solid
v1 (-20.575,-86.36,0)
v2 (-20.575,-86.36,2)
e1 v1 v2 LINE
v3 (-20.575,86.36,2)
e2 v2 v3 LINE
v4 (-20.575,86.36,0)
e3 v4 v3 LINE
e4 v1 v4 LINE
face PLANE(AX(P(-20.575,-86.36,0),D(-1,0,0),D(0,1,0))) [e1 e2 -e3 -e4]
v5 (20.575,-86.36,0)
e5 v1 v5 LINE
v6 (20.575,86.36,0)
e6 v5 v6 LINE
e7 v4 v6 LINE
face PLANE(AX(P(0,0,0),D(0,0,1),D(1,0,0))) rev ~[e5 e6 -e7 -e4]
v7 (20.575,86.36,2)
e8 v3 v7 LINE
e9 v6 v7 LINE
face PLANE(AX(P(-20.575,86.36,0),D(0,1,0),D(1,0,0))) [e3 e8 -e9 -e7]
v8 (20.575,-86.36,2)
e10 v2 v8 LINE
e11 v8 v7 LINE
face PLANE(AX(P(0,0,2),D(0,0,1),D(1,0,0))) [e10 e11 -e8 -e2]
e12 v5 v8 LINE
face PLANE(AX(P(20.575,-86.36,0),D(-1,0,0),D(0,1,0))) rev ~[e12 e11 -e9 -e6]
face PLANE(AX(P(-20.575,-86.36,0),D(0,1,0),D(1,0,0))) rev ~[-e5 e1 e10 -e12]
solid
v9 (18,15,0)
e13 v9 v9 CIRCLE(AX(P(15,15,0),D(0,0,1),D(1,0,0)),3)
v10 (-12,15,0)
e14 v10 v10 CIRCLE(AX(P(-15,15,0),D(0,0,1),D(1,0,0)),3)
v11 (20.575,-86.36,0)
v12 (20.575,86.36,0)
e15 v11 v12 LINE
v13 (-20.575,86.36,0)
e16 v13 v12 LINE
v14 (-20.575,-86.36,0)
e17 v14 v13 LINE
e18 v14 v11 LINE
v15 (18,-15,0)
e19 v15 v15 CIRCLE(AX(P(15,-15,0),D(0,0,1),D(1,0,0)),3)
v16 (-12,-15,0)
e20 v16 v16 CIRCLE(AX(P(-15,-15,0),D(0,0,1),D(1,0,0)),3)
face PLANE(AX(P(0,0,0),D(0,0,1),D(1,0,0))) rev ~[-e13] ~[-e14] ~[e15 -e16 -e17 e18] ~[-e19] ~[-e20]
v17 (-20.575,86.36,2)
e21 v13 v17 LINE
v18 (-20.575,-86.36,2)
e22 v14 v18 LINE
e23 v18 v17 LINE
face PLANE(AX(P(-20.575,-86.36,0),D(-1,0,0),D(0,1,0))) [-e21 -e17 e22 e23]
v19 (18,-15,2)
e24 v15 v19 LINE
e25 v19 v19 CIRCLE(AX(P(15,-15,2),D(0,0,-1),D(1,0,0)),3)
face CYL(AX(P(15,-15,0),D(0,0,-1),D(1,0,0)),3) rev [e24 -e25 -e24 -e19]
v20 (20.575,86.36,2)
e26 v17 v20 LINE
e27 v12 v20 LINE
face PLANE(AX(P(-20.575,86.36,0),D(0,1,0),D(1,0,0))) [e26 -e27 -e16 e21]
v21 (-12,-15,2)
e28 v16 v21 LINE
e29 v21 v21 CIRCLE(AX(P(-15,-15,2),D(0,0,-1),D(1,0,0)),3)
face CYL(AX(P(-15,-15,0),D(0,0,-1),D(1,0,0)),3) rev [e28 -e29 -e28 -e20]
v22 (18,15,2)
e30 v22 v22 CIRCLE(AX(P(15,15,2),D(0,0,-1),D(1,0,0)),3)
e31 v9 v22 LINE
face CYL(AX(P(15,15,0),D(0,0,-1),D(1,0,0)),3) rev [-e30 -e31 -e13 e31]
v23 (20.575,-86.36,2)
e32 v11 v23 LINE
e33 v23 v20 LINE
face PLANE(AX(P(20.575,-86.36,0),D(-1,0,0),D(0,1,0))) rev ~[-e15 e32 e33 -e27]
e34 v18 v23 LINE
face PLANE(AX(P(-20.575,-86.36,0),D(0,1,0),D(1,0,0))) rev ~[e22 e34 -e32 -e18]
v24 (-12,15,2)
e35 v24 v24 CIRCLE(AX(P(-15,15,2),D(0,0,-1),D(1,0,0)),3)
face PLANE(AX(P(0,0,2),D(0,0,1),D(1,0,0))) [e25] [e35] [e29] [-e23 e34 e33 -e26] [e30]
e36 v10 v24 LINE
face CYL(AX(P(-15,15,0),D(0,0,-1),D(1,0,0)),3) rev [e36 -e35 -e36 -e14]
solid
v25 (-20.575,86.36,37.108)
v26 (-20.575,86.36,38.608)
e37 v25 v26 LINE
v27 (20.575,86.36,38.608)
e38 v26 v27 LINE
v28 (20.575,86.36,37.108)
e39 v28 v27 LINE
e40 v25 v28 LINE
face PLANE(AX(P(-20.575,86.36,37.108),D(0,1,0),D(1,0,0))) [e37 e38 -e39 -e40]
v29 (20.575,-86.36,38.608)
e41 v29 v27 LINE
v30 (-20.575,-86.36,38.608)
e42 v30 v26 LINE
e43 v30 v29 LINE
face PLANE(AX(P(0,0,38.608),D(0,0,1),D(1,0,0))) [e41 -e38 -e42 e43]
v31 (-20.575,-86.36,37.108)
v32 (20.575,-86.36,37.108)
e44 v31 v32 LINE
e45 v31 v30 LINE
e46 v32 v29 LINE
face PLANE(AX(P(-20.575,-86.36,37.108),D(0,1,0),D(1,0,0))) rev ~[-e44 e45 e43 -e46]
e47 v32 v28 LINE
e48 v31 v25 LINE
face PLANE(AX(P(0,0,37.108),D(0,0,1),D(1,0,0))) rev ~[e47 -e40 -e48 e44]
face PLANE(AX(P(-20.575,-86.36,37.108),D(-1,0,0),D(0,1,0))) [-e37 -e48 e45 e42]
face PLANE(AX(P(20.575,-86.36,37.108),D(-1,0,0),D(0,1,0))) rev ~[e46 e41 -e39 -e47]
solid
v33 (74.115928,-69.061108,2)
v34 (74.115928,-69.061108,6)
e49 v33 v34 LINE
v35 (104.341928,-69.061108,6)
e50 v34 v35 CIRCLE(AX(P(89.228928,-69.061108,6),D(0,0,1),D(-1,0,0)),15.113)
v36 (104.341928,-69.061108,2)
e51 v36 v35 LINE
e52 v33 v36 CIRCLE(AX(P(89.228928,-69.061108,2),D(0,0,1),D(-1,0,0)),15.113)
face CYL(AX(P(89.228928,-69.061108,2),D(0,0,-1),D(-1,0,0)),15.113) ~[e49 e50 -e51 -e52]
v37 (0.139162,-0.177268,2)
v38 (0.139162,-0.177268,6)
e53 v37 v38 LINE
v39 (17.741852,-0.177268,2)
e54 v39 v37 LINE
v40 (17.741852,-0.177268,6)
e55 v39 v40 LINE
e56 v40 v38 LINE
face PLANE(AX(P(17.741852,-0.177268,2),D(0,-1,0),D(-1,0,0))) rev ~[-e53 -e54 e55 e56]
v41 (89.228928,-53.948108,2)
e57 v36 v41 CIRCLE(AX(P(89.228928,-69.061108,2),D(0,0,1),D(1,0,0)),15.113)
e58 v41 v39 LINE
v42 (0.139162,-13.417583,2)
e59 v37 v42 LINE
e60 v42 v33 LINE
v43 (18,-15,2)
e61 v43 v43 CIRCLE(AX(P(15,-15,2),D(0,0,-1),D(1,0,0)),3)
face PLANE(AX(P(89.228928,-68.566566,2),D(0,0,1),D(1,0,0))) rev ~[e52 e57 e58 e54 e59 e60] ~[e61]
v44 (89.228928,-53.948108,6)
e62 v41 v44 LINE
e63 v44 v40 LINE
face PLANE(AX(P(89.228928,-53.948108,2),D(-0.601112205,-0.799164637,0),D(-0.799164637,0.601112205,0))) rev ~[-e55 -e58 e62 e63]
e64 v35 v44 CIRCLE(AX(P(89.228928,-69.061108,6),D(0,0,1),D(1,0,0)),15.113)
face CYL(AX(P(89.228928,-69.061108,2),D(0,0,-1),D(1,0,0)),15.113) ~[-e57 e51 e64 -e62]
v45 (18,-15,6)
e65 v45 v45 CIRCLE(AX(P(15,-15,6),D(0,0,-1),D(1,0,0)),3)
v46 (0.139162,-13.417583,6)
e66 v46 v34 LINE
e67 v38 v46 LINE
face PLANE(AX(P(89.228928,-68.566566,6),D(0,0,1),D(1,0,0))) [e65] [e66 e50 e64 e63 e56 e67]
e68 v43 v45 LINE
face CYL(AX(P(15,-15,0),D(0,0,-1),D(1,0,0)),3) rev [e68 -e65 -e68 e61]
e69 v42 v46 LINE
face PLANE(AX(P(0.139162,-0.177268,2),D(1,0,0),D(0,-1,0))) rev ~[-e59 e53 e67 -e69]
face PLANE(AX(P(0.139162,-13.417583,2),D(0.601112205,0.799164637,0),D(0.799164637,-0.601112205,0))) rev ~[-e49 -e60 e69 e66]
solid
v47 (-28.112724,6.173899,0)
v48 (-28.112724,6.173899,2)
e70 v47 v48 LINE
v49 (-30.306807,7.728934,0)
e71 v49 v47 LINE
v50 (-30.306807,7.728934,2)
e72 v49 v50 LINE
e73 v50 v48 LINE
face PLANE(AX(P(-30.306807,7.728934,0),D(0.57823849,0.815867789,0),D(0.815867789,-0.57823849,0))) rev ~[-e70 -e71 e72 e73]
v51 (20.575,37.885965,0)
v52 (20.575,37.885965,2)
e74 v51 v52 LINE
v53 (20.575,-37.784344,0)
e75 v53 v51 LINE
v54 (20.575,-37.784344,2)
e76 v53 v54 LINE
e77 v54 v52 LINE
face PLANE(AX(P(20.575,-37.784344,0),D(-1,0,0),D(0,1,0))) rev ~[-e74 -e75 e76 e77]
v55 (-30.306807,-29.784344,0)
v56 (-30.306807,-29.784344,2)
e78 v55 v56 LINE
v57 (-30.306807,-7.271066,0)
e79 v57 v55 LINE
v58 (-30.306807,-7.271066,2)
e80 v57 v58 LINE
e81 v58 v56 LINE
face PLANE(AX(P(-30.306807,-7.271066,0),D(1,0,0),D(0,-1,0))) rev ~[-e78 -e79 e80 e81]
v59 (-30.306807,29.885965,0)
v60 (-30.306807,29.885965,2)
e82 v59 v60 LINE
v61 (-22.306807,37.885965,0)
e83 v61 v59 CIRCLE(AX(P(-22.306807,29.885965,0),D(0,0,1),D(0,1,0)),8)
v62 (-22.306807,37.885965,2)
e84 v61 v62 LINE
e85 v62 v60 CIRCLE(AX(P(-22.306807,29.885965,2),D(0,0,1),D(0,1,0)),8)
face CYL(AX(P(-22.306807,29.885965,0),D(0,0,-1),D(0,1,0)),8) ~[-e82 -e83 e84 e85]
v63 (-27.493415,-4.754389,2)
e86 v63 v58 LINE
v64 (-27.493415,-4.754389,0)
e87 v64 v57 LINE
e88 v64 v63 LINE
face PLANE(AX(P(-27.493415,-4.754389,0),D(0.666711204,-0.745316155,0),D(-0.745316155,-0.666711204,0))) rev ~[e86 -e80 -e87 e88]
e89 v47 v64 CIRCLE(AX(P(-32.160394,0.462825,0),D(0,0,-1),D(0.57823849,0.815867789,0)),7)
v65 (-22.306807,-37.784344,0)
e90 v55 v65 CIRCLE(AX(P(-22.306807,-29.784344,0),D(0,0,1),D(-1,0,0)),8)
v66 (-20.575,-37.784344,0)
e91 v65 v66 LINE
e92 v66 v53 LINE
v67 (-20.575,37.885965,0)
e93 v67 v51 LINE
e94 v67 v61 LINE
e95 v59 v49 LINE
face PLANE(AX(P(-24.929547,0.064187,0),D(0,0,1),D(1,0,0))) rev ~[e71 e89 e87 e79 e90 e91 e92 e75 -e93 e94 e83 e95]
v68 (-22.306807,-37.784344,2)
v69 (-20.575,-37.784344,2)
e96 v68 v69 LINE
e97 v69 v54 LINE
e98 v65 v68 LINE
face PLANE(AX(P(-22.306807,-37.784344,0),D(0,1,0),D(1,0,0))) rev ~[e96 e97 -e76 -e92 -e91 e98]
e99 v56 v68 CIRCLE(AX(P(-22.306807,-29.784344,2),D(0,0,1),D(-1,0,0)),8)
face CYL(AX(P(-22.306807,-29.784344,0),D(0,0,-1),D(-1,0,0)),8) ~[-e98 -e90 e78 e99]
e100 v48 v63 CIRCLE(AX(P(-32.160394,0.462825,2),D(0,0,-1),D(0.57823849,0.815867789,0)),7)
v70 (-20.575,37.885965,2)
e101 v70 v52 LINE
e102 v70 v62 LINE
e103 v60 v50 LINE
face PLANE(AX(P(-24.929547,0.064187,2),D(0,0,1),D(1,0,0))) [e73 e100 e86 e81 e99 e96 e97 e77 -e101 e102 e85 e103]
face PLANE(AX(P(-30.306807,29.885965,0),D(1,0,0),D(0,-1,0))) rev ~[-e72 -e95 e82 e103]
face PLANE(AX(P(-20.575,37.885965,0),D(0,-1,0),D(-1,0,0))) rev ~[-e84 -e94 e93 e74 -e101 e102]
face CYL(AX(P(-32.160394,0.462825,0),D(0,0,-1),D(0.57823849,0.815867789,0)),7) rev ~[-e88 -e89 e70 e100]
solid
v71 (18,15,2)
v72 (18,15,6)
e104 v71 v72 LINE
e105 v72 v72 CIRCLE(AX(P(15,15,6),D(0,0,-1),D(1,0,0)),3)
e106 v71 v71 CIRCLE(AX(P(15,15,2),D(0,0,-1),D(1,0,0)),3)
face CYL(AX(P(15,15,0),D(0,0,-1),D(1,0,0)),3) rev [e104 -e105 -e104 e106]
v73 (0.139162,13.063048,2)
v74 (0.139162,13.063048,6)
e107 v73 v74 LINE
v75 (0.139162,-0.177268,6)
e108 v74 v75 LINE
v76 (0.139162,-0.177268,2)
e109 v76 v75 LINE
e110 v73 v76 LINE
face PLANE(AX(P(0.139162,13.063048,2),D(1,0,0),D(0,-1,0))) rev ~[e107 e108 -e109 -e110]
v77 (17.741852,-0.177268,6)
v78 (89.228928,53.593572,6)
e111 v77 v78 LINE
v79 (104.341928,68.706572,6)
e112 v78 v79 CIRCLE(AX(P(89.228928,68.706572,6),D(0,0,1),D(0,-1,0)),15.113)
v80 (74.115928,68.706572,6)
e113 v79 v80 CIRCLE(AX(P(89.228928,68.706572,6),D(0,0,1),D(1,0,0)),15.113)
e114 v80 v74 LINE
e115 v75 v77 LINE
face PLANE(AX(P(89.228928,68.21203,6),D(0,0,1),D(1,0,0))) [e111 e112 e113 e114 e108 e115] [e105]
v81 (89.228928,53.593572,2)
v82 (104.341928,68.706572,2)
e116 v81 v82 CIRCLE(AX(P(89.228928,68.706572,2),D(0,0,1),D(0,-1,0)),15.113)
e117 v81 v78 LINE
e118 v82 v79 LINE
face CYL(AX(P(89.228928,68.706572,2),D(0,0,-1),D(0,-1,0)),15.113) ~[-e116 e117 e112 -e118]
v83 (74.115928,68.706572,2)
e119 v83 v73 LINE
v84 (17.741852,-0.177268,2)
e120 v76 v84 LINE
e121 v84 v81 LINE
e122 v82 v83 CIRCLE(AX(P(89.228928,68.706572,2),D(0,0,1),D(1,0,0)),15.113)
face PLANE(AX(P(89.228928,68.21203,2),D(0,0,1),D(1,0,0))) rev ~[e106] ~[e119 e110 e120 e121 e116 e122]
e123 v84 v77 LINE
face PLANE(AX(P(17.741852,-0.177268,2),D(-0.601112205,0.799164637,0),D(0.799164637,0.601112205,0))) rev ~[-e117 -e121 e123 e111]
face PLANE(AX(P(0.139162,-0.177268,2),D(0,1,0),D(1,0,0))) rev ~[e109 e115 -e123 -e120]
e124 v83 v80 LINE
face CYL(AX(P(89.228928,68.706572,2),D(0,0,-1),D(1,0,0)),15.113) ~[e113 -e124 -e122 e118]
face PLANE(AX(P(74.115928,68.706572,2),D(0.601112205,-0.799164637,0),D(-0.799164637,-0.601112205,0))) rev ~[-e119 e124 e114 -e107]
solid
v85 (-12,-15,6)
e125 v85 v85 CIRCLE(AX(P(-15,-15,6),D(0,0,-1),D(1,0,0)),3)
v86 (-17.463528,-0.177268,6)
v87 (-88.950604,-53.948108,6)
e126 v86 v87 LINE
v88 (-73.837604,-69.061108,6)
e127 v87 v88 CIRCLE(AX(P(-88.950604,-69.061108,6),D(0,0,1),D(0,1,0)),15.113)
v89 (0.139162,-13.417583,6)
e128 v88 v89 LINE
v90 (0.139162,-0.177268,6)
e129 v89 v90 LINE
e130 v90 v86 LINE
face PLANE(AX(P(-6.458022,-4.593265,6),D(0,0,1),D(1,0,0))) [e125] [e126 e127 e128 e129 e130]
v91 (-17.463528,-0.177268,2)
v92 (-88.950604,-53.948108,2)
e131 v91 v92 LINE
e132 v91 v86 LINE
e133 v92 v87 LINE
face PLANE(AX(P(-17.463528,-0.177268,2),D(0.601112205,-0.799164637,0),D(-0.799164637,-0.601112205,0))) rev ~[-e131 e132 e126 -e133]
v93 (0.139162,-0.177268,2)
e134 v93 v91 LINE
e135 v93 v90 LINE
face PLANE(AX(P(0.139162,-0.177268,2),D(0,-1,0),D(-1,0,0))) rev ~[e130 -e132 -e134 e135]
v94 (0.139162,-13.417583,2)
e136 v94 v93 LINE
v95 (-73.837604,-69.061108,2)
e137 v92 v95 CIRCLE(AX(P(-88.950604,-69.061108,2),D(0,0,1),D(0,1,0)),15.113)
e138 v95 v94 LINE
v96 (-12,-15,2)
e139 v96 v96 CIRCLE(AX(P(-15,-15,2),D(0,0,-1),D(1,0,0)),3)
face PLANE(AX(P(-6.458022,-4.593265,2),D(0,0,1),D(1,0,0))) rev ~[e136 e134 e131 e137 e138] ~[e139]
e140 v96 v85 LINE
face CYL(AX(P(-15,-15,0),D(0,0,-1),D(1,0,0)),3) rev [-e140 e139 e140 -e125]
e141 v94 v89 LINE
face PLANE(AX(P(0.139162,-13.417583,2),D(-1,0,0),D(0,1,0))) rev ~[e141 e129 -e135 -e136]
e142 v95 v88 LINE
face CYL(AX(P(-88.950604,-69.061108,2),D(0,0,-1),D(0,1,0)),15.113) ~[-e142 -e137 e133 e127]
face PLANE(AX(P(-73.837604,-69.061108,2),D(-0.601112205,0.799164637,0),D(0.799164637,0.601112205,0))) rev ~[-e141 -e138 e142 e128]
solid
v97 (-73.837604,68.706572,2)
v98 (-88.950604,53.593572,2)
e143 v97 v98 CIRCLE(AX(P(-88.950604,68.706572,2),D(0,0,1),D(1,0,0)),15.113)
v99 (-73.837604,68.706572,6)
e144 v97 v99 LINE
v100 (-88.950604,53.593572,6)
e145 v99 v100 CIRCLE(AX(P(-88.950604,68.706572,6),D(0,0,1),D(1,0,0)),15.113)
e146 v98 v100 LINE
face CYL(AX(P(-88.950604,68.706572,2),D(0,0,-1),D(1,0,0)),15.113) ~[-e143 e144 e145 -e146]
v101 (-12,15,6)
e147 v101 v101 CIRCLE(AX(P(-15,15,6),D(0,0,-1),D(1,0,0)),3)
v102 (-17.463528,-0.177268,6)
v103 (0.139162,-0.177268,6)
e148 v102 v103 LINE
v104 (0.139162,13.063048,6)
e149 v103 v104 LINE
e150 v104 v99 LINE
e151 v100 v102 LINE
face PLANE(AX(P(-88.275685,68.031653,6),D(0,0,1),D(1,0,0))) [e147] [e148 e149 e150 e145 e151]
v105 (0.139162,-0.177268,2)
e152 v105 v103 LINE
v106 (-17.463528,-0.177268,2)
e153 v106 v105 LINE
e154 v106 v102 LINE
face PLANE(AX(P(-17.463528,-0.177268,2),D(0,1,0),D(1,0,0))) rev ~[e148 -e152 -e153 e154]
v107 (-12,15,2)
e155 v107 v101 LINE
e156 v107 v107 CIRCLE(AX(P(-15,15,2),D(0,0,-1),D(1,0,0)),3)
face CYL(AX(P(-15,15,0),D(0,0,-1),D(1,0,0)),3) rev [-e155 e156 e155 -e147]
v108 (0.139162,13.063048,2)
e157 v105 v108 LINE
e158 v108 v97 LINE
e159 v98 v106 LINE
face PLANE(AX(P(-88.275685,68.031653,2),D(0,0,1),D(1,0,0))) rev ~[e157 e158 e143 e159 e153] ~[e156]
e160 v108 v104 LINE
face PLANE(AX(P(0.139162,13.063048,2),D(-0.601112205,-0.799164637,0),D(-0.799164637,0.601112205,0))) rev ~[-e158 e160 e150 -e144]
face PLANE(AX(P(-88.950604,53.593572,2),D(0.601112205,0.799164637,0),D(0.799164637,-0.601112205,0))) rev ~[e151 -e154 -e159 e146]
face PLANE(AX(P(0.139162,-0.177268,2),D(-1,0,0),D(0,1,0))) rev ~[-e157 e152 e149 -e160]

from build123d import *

# Parameters (mm, degrees)
F0_W           = 41.15
F0_H           = 172.72
F1_DEPTH       = 2
F3_START       = 2
F3_DEPTH       = 4
F4_START       = 2
F4_DEPTH       = 4
F5_START       = 2
F5_DEPTH       = 4
F6_START       = 2
F6_DEPTH       = 4
F8_START       = 37.108
F7_W           = 41.15
F7_H           = 172.72
F8_DEPTH       = 1.5
F9_R           = 3
F10_DEPTH      = 2
F10_DEPTH_BACK = 8
F11_W          = 41.15
F11_H          = 75.6703085505
F12_DEPTH      = 2


# Not quite as in the source:
# - a feature names something its author has since deleted; it is built from what else it names


with BuildPart() as f1:
    # F0 (on Top) → F1 (new body)
    with BuildSketch(Plane.XY):
        Rectangle(F0_W, F0_H)
    extrude(amount=F1_DEPTH)


with BuildPart() as f3:
    # F2 (on Top) → F3 (new body)
    with BuildSketch(Plane.XY.offset(F3_START)):
        Polygon((0.1391619444, -0.1772679389), (-17.4635283139, -0.1772679389), (0.1391619444, -13.4175834731), align=None)
        with BuildLine():
            Line((0.1391619444, -13.4175834731), (-17.4635283139, -0.1772679389))
            Line((-17.4635283139, -0.1772679389), (-88.9506042004, -53.9481079335))
            ThreePointArc((-88.9506042004, -53.9481079335), (-78.2640994163, -58.3746031494), (-73.8376042004, -69.0611079335))
            Line((-73.8376042004, -69.0611079335), (0.1391619444, -13.4175834731))
        make_face()
        with BuildLine():
            ThreePointArc((-73.8376042004, -69.0611079335), (-78.2640994163, -58.3746031494), (-88.9506042004, -53.9481079335))
            ThreePointArc((-88.9506042004, -53.9481079335), (-99.6371089844, -79.7476127176), (-73.8376042004, -69.0611079335))
        make_face()
    extrude(amount=F3_DEPTH)


with BuildPart() as f4:
    # F2 (on Top) → F4 (new body)
    with BuildSketch(Plane.XY.offset(F4_START)):
        with BuildLine():
            ThreePointArc((104.3419280891, -69.0611079335), (99.9154328732, -58.3746031494), (89.2289280891, -53.9481079335))
            ThreePointArc((89.2289280891, -53.9481079335), (78.5424233051, -58.3746031494), (74.1159280891, -69.0611079335))
            ThreePointArc((74.1159280891, -69.0611079335), (89.2289280891, -84.1741079335), (104.3419280891, -69.0611079335))
        make_face()
        with BuildLine():
            Line((89.2289280891, -53.9481079335), (17.7418522027, -0.1772679389))
            Line((17.7418522027, -0.1772679389), (0.1391619444, -13.4175834731))
            Line((0.1391619444, -13.4175834731), (74.1159280891, -69.0611079335))
            ThreePointArc((74.1159280891, -69.0611079335), (78.5424233051, -58.3746031494), (89.2289280891, -53.9481079335))
        make_face()
        Polygon((0.1391619444, -13.4175834731), (17.7418522027, -0.1772679389), (0.1391619444, -0.1772679389), align=None)
    extrude(amount=F4_DEPTH)


with BuildPart() as f5:
    # F2 (on Top) → F5 (new body)
    with BuildSketch(Plane.XY.offset(F5_START)):
        with BuildLine():
            ThreePointArc((104.3419280891, 68.7065720558), (89.2289280891, 83.8195720558), (74.1159280891, 68.7065720558))
            ThreePointArc((74.1159280891, 68.7065720558), (78.5424233051, 58.0200672717), (89.2289280891, 53.5935720558))
            ThreePointArc((89.2289280891, 53.5935720558), (99.9154328732, 58.0200672717), (104.3419280891, 68.7065720558))
        make_face()
        with BuildLine():
            Line((74.1159280891, 68.7065720558), (0.1391619444, 13.0630475954))
            Line((0.1391619444, 13.0630475954), (17.7418522027, -0.1772679389))
            Line((17.7418522027, -0.1772679389), (89.2289280891, 53.5935720558))
            ThreePointArc((89.2289280891, 53.5935720558), (78.5424233051, 58.0200672717), (74.1159280891, 68.7065720558))
        make_face()
        Polygon((17.7418522027, -0.1772679389), (0.1391619444, 13.0630475954), (0.1391619444, -0.1772679389), align=None)
    extrude(amount=F5_DEPTH)


with BuildPart() as f6:
    # F2 (on Top) → F6 (new body)
    with BuildSketch(Plane.XY.offset(F6_START)):
        with BuildLine():
            ThreePointArc((-88.9506042004, 53.5935720558), (-78.2640994163, 58.0200672717), (-73.8376042004, 68.7065720558))
            ThreePointArc((-73.8376042004, 68.7065720558), (-99.6371089844, 79.3930768399), (-88.9506042004, 53.5935720558))
        make_face()
        with BuildLine():
            Line((0.1391619444, 13.0630475954), (-73.8376042004, 68.7065720558))
            ThreePointArc((-73.8376042004, 68.7065720558), (-78.2640994163, 58.0200672717), (-88.9506042004, 53.5935720558))
            Line((-88.9506042004, 53.5935720558), (-17.4635283139, -0.1772679389))
            Line((-17.4635283139, -0.1772679389), (0.1391619444, 13.0630475954))
        make_face()
        Polygon((0.1391619444, -0.1772679389), (0.1391619444, 13.0630475954), (-17.4635283139, -0.1772679389), align=None)
    extrude(amount=F6_DEPTH)


with BuildPart() as f8:
    # F7 (on Top) → F8 (new body)
    with BuildSketch(Plane.XY.offset(F8_START)):
        Rectangle(F7_W, F7_H)
    extrude(amount=F8_DEPTH)


with BuildPart() as f10_tool:
    # F9 (on face) → F10 (new body, two sides)
    with BuildSketch(Plane.XY) as f10_sk:
        with Locations((15, 15)):
            Circle(F9_R)
        with Locations((15, -15)):
            Circle(F9_R)
        with Locations((-15, -15)):
            Circle(F9_R)
        with Locations((-15, 15)):
            Circle(F9_R)
    extrude(amount=-F10_DEPTH)
    extrude(f10_sk.sketch, amount=F10_DEPTH_BACK)


with BuildPart() as f1_1:
    add(f1.part)

    # F10: cut by f10_tool
    add(f10_tool.part, mode=Mode.SUBTRACT)


with BuildPart() as f3_1:
    add(f3.part)

    # F10: cut by f10_tool
    add(f10_tool.part, mode=Mode.SUBTRACT)


with BuildPart() as f4_1:
    add(f4.part)

    # F10: cut by f10_tool
    add(f10_tool.part, mode=Mode.SUBTRACT)


with BuildPart() as f5_1:
    add(f5.part)

    # F10: cut by f10_tool
    add(f10_tool.part, mode=Mode.SUBTRACT)


with BuildPart() as f6_1:
    add(f6.part)

    # F10: cut by f10_tool
    add(f10_tool.part, mode=Mode.SUBTRACT)


with BuildPart() as f12:
    # F11 (on face) → F12 (new body)
    with BuildSketch(Plane.XY):
        with BuildLine():
            Line((-20.575, 37.8859647318), (-22.3068072487, 37.8859647318))
            ThreePointArc((-22.3068072487, 37.8859647318), (-27.9636614982, 35.5428189813), (-30.3068072487, 29.8859647318))
            Line((-30.3068072487, 29.8859647318), (-30.3068072487, 7.7289344695))
            Line((-30.3068072487, 7.7289344695), (-28.1127241634, 6.173899075))
            ThreePointArc((-28.1127241634, 6.173899075), (-25.1716069065, 0.8588809734), (-27.4934151644, -4.7543885332))
            Line((-27.4934151644, -4.7543885332), (-30.3068072487, -7.2710655305))
            Line((-30.3068072487, -7.2710655305), (-30.3068072487, -29.7843438187))
            ThreePointArc((-30.3068072487, -29.7843438187), (-27.9636614982, -35.4411980681), (-22.3068072487, -37.7843438187))
            Line((-22.3068072487, -37.7843438187), (-20.575, -37.7843438187))
            Line((-20.575, -37.7843438187), (-20.575, 37.8859647318))
        make_face()
        with Locations((0, 0.0508104566)):
            Rectangle(F11_W, F11_H)
    extrude(amount=F12_DEPTH)


with BuildPart() as f12b:
    # F0 (on Top) → F12, piece 2 (new body)
    with BuildSketch(Plane.XY):
        Rectangle(F0_W, F0_H)
    extrude(amount=F12_DEPTH)


solid = Compound([f8.part, f1_1.part, f3_1.part, f4_1.part, f5_1.part, f6_1.part, f12.part, f12b.part])
